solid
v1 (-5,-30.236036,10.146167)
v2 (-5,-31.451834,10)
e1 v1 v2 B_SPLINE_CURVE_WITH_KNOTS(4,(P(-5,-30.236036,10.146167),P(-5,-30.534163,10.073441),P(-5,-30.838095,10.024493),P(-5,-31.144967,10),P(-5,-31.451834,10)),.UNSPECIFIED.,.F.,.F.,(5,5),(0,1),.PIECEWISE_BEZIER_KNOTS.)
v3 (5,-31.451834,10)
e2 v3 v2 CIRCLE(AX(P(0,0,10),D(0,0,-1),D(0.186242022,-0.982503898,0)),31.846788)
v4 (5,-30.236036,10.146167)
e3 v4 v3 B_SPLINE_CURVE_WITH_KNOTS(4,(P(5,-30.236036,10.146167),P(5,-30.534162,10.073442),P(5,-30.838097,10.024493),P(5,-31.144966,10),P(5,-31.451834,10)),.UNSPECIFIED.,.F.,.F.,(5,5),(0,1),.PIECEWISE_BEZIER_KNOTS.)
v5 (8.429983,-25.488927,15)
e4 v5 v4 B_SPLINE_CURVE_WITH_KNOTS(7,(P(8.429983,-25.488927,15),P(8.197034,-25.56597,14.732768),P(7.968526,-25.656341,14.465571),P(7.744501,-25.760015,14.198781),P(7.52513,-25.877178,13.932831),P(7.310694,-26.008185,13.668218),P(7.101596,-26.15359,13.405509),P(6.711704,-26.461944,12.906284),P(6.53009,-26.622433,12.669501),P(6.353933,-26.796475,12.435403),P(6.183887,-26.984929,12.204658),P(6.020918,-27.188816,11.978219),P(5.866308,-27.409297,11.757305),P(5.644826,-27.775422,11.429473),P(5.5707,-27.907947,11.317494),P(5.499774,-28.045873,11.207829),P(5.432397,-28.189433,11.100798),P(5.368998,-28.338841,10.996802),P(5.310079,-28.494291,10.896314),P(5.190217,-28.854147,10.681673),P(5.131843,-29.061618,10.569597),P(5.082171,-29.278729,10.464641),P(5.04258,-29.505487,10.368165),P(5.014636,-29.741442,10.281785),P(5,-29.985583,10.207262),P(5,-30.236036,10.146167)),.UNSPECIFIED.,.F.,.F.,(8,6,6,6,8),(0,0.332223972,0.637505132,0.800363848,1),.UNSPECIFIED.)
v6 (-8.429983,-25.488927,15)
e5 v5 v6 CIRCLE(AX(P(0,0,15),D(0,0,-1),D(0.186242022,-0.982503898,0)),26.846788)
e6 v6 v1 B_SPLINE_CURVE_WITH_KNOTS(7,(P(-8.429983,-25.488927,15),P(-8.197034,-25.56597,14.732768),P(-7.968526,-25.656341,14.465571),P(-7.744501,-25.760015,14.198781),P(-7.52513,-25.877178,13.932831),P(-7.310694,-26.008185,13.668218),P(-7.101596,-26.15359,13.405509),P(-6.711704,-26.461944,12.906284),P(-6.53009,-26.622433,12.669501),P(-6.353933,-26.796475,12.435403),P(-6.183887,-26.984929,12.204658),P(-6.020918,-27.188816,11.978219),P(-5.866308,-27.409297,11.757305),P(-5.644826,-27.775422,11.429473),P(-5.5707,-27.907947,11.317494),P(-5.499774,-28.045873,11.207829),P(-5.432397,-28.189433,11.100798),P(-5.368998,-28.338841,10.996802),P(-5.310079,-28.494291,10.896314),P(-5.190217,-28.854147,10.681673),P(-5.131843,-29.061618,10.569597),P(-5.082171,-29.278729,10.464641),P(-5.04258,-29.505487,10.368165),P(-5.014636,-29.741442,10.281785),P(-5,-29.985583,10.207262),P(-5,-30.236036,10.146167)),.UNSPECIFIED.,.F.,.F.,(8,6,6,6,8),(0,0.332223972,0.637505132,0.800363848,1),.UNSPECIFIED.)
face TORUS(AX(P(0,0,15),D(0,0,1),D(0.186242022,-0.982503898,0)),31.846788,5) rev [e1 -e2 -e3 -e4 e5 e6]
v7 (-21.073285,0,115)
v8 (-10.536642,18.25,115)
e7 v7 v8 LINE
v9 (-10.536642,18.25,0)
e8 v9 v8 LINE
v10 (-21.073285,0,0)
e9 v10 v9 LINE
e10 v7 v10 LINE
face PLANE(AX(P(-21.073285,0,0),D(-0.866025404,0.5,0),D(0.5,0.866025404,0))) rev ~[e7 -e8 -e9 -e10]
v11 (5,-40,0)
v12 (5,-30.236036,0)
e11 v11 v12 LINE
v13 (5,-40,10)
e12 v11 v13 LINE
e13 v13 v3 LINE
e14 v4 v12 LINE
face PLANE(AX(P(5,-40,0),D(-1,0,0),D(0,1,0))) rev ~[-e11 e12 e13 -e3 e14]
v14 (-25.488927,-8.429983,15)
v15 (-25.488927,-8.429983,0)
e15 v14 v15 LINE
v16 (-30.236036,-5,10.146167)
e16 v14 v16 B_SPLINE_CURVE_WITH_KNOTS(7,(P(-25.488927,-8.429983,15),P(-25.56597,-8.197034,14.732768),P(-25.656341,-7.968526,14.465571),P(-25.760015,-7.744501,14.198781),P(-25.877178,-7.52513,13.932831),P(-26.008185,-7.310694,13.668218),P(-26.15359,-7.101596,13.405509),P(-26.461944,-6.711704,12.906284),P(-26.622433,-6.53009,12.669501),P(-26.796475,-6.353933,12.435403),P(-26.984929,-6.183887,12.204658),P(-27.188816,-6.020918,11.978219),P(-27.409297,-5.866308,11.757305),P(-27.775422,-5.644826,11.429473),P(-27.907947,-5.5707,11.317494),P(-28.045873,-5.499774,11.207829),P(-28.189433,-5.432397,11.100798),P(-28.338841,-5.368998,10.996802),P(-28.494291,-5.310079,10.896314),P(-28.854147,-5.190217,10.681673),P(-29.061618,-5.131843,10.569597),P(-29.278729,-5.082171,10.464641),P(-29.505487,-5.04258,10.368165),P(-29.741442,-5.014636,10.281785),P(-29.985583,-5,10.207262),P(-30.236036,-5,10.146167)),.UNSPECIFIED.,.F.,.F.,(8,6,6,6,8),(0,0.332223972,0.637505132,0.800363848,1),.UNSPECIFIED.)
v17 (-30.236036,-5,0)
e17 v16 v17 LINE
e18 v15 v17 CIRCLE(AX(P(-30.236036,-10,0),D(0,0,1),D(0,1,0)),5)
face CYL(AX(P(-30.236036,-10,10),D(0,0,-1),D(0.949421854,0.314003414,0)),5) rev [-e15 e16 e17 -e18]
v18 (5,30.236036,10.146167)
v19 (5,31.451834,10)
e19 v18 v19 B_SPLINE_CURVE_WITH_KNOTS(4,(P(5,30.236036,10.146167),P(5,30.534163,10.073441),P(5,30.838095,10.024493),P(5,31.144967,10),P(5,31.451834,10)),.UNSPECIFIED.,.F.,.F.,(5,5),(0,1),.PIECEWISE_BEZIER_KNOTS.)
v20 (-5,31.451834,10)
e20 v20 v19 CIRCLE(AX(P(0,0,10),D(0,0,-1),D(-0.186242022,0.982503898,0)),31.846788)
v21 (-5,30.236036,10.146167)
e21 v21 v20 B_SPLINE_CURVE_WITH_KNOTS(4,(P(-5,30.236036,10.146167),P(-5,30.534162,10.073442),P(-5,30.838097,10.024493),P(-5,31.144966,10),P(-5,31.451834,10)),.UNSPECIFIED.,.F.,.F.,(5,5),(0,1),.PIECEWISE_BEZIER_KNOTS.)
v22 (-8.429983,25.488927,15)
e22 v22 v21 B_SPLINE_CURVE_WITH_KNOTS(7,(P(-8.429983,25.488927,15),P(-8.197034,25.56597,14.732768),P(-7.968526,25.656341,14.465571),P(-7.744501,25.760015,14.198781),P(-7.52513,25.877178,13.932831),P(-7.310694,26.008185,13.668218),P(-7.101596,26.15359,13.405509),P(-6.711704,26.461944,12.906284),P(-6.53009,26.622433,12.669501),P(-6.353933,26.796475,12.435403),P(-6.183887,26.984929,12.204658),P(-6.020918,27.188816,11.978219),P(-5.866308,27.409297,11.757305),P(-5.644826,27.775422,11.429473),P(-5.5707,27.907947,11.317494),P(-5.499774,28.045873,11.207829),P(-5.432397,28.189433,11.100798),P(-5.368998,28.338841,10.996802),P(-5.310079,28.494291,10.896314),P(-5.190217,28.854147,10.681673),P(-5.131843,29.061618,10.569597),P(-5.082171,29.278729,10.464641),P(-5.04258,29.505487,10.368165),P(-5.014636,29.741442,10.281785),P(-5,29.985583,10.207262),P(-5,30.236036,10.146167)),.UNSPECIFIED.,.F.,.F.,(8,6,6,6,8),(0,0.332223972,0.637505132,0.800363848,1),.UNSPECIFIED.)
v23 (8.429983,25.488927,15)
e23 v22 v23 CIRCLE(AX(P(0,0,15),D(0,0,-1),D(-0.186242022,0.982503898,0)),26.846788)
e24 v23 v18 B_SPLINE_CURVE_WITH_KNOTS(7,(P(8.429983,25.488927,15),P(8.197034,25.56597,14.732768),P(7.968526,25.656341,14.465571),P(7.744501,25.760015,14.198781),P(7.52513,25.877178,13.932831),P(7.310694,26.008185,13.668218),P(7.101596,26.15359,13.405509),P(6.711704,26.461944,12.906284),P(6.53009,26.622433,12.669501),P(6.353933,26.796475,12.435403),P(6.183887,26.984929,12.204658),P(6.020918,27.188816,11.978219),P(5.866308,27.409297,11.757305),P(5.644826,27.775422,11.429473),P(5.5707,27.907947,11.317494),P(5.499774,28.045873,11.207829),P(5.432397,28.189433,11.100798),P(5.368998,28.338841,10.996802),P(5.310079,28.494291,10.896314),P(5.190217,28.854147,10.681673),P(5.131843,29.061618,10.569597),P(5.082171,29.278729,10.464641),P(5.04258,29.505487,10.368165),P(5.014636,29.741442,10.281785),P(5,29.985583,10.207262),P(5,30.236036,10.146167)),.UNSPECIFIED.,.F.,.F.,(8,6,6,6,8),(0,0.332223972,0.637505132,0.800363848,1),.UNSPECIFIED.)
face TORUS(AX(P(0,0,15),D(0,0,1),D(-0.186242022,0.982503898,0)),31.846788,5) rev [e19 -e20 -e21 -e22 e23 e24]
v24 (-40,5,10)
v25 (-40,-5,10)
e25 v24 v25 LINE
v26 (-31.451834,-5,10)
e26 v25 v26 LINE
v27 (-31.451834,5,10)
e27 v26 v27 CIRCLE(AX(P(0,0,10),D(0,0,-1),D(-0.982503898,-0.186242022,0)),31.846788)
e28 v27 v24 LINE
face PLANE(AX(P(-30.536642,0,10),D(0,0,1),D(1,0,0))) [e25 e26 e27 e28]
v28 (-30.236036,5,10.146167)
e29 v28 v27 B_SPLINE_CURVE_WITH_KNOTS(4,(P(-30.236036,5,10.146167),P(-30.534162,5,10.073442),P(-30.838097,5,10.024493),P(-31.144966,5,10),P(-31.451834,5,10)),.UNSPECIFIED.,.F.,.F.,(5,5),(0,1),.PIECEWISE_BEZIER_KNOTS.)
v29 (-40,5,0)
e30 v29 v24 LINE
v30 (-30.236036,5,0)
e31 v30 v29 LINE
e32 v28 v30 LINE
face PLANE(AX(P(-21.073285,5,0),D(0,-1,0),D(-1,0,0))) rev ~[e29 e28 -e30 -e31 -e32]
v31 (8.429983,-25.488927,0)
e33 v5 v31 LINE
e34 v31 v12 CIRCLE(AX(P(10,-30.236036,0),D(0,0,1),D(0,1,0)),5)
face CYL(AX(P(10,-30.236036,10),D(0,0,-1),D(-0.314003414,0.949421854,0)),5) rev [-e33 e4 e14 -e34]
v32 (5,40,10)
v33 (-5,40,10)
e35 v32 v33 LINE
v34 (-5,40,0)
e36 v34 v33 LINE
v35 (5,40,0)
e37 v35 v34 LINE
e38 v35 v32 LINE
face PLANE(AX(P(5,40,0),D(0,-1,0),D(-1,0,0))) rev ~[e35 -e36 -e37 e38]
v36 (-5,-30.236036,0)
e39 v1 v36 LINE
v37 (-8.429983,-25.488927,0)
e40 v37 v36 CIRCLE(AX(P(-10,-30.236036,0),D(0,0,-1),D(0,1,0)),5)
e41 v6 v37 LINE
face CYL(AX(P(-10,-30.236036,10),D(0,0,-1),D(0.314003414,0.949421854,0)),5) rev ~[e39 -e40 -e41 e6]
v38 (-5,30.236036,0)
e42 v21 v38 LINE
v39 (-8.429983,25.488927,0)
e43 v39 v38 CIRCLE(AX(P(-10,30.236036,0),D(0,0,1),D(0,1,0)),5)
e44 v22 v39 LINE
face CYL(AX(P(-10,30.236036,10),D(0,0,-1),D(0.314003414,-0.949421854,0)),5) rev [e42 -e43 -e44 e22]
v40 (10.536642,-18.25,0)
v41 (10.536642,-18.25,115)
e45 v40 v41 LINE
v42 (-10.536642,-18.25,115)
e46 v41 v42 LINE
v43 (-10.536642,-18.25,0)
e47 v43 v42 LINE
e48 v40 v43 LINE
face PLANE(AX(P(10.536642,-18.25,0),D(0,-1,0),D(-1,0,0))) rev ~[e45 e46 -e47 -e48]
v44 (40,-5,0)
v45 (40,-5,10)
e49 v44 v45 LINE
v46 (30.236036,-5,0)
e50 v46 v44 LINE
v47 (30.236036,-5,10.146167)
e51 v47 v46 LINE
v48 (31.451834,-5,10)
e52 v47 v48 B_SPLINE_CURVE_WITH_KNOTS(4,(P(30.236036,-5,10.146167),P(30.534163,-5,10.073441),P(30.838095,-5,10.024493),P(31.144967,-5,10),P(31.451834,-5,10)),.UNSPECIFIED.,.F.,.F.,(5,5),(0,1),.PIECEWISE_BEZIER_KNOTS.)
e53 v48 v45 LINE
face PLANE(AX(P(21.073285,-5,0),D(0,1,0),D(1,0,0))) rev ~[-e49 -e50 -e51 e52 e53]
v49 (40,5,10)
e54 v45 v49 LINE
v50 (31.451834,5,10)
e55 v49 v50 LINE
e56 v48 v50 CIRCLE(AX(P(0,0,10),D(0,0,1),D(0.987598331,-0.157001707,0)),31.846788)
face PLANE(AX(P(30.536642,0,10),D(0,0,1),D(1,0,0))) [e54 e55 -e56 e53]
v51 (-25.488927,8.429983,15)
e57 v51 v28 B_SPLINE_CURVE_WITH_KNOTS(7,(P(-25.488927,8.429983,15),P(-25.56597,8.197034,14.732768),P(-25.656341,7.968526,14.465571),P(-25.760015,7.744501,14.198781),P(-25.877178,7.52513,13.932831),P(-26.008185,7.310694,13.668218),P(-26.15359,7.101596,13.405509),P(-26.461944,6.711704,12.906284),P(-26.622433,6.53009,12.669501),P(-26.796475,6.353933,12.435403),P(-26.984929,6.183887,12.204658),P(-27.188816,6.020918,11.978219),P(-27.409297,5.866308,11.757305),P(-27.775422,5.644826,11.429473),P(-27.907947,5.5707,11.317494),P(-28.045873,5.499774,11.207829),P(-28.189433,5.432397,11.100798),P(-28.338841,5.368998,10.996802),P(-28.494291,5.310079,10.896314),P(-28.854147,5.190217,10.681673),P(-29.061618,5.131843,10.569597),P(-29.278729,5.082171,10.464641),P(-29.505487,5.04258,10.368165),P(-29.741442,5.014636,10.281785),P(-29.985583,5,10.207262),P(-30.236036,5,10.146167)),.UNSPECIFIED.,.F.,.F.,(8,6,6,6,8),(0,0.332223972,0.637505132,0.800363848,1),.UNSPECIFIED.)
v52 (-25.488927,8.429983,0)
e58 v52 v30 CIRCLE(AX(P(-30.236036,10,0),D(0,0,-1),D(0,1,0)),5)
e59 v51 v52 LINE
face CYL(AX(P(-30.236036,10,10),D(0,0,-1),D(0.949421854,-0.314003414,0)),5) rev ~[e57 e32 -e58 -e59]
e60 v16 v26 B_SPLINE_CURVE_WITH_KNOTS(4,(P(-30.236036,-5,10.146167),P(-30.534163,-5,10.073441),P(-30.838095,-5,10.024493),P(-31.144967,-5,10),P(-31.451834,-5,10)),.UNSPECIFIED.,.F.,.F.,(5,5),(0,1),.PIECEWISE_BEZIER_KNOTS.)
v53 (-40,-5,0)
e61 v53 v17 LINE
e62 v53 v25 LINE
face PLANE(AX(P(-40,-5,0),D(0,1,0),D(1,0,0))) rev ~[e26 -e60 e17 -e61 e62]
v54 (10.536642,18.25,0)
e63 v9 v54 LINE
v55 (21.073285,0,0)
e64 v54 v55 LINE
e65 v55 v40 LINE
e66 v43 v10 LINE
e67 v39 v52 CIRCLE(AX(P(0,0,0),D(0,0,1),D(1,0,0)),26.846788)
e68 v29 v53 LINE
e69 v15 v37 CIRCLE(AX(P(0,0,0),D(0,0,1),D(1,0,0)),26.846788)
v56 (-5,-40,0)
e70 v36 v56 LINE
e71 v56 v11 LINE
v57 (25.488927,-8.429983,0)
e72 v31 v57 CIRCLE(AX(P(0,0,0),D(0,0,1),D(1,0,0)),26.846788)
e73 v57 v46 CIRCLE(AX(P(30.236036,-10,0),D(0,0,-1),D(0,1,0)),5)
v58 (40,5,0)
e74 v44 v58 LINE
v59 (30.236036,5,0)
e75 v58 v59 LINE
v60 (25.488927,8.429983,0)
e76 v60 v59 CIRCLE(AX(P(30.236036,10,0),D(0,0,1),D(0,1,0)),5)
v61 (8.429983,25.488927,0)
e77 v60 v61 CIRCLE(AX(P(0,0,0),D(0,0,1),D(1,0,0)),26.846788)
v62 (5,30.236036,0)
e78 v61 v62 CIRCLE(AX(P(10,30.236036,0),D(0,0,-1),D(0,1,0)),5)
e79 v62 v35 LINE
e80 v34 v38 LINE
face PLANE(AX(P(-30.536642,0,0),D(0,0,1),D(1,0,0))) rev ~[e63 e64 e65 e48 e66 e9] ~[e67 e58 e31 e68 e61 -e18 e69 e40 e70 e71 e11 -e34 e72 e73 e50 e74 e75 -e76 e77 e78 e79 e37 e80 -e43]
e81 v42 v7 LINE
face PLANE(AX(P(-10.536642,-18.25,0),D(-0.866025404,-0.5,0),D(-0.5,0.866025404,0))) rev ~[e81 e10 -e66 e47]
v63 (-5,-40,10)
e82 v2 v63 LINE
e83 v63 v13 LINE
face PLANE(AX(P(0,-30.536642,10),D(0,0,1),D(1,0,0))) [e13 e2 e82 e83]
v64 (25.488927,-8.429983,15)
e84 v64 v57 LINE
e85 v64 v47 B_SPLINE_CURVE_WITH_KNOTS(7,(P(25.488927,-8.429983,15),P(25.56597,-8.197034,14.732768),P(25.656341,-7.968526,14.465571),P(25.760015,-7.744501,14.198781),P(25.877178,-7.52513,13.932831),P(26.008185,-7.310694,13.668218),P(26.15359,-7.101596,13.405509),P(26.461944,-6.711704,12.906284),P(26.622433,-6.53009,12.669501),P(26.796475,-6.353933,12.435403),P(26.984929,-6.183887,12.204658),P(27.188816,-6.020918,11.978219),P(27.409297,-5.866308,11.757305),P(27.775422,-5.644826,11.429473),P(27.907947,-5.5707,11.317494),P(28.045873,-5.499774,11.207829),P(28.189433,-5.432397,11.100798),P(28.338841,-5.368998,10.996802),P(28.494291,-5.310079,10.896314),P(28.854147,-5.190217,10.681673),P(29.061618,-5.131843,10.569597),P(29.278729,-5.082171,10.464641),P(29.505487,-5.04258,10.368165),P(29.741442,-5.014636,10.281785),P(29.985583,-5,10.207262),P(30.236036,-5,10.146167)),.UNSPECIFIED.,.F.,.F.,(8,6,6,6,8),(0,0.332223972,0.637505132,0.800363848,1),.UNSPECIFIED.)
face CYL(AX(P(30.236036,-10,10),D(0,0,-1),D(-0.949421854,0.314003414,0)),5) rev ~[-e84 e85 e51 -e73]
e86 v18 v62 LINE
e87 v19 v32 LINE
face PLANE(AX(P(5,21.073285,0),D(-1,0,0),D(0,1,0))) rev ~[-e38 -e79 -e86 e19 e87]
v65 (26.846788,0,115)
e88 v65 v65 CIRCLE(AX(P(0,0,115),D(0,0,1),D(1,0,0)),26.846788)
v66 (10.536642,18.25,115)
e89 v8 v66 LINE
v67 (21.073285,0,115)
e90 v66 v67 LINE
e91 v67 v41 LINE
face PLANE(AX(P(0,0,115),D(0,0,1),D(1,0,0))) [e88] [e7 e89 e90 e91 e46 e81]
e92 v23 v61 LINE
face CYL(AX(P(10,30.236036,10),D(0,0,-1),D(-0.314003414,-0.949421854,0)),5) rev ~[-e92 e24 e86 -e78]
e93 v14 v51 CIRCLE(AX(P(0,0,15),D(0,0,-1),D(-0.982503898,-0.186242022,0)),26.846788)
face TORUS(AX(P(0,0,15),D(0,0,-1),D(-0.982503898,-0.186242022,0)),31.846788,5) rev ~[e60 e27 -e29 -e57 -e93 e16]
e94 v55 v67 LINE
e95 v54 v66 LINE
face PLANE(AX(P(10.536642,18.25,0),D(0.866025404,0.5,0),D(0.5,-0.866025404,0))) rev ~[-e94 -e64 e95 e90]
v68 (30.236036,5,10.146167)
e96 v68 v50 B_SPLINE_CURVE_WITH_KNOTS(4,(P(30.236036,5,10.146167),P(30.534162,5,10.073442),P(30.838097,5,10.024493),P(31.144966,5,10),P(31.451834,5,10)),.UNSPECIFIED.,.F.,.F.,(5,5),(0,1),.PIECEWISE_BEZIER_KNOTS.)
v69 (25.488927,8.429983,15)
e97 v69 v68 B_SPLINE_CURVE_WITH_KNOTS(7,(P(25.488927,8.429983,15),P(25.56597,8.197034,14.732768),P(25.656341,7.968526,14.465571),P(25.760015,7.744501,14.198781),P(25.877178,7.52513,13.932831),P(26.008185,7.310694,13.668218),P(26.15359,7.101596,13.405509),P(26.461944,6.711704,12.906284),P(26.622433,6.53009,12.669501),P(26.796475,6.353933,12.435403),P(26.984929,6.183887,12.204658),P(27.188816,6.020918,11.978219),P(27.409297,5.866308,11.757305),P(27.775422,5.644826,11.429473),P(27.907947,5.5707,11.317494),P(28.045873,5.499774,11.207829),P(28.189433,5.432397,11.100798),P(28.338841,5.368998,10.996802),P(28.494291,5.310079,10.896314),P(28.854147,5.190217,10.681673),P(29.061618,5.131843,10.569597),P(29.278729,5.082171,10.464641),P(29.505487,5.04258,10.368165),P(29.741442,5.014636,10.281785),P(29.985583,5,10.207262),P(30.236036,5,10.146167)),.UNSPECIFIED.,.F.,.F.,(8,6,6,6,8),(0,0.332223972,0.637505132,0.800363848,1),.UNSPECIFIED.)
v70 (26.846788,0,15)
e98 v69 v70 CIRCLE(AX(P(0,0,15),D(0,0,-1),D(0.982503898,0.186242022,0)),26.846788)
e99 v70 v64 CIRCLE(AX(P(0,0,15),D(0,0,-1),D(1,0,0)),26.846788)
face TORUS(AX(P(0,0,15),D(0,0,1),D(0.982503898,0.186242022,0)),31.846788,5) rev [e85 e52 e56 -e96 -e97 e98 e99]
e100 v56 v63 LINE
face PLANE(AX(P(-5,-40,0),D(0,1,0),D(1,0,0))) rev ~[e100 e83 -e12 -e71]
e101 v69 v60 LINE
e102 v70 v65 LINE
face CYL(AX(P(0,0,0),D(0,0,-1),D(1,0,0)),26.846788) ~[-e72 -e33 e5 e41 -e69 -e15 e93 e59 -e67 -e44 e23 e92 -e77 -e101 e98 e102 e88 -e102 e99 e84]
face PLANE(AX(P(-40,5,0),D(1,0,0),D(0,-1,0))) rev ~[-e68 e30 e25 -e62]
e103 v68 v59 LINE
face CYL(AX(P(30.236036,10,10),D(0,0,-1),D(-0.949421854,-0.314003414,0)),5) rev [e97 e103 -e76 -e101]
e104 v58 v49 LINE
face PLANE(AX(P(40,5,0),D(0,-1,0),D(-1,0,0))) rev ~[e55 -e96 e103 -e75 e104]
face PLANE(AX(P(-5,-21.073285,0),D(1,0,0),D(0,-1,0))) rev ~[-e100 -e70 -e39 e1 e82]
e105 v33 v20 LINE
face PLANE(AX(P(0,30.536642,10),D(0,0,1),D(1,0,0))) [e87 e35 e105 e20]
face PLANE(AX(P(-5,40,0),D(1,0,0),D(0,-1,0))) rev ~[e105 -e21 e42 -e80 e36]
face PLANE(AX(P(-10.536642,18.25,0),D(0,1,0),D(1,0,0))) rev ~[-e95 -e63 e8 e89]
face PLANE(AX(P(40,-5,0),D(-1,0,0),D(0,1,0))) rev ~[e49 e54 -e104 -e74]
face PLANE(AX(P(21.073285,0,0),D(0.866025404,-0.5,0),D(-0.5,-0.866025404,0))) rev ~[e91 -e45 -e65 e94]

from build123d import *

# Parameters (mm, degrees)
F0_R     = 26.8467875173
F1_DEPTH = 115
F3_DEPTH = 10
F5_R     = 5


# Not quite as in the source:
# - a feature of the source that left no trace in its solid (it failed there, or was rolled back) is left out


with BuildPart() as f1:
    # F0 (on Top) → F1 (new body)
    with BuildSketch(Plane.XY):
        Circle(F0_R)
        Polygon((-21.0732848254, 0), (-10.5366424127, 18.25), (10.5366424127, 18.25), (21.0732848254, 0), (10.5366424127, -18.25), (-10.5366424127, -18.25), align=None, mode=Mode.SUBTRACT)
    extrude(amount=F1_DEPTH)

    # F2 (on Top) → F3 (join)
    with BuildSketch(Plane.XY):
        Polygon((-40, 5), (-40, 0), (-40, -5), (-21.0732848254, -5), (-21.0732848254, 0), (-21.0732848254, 5), align=None)
        Polygon((0, 40), (-5, 40), (-5, 21.0732848254), (0, 21.0732848254), (5, 21.0732848254), (5, 40), align=None)
        Polygon((40, 0), (40, 5), (21.0732848254, 5), (21.0732848254, 0), (21.0732848254, -5), (40, -5), align=None)
        Polygon((0, -40), (5, -40), (5, -21.0732848254), (0, -21.0732848254), (-5, -21.0732848254), (-5, -40), align=None)
    extrude(amount=F3_DEPTH)

    # F5
    f5_edges = [f1.edges().sort_by_distance(p)[0] for p in [
        (0, 26.846788, 10),
        (-26.846788, 0, 10),
        (0, -26.846788, 10),
        (26.729101, 2.511007, 10),
        (26.729101, -2.511007, 10),
        (26.377073, -5, 5),
        (5, -26.377073, 5),
        (-5, -26.377073, 5),
        (-26.377073, -5, 5),
        (-26.377073, 5, 5),
        (-5, 26.377073, 5),
        (5, 26.377073, 5),
        (26.377073, 5, 5),
    ]]
    fillet(f5_edges, radius=F5_R)


solid = f1.part
